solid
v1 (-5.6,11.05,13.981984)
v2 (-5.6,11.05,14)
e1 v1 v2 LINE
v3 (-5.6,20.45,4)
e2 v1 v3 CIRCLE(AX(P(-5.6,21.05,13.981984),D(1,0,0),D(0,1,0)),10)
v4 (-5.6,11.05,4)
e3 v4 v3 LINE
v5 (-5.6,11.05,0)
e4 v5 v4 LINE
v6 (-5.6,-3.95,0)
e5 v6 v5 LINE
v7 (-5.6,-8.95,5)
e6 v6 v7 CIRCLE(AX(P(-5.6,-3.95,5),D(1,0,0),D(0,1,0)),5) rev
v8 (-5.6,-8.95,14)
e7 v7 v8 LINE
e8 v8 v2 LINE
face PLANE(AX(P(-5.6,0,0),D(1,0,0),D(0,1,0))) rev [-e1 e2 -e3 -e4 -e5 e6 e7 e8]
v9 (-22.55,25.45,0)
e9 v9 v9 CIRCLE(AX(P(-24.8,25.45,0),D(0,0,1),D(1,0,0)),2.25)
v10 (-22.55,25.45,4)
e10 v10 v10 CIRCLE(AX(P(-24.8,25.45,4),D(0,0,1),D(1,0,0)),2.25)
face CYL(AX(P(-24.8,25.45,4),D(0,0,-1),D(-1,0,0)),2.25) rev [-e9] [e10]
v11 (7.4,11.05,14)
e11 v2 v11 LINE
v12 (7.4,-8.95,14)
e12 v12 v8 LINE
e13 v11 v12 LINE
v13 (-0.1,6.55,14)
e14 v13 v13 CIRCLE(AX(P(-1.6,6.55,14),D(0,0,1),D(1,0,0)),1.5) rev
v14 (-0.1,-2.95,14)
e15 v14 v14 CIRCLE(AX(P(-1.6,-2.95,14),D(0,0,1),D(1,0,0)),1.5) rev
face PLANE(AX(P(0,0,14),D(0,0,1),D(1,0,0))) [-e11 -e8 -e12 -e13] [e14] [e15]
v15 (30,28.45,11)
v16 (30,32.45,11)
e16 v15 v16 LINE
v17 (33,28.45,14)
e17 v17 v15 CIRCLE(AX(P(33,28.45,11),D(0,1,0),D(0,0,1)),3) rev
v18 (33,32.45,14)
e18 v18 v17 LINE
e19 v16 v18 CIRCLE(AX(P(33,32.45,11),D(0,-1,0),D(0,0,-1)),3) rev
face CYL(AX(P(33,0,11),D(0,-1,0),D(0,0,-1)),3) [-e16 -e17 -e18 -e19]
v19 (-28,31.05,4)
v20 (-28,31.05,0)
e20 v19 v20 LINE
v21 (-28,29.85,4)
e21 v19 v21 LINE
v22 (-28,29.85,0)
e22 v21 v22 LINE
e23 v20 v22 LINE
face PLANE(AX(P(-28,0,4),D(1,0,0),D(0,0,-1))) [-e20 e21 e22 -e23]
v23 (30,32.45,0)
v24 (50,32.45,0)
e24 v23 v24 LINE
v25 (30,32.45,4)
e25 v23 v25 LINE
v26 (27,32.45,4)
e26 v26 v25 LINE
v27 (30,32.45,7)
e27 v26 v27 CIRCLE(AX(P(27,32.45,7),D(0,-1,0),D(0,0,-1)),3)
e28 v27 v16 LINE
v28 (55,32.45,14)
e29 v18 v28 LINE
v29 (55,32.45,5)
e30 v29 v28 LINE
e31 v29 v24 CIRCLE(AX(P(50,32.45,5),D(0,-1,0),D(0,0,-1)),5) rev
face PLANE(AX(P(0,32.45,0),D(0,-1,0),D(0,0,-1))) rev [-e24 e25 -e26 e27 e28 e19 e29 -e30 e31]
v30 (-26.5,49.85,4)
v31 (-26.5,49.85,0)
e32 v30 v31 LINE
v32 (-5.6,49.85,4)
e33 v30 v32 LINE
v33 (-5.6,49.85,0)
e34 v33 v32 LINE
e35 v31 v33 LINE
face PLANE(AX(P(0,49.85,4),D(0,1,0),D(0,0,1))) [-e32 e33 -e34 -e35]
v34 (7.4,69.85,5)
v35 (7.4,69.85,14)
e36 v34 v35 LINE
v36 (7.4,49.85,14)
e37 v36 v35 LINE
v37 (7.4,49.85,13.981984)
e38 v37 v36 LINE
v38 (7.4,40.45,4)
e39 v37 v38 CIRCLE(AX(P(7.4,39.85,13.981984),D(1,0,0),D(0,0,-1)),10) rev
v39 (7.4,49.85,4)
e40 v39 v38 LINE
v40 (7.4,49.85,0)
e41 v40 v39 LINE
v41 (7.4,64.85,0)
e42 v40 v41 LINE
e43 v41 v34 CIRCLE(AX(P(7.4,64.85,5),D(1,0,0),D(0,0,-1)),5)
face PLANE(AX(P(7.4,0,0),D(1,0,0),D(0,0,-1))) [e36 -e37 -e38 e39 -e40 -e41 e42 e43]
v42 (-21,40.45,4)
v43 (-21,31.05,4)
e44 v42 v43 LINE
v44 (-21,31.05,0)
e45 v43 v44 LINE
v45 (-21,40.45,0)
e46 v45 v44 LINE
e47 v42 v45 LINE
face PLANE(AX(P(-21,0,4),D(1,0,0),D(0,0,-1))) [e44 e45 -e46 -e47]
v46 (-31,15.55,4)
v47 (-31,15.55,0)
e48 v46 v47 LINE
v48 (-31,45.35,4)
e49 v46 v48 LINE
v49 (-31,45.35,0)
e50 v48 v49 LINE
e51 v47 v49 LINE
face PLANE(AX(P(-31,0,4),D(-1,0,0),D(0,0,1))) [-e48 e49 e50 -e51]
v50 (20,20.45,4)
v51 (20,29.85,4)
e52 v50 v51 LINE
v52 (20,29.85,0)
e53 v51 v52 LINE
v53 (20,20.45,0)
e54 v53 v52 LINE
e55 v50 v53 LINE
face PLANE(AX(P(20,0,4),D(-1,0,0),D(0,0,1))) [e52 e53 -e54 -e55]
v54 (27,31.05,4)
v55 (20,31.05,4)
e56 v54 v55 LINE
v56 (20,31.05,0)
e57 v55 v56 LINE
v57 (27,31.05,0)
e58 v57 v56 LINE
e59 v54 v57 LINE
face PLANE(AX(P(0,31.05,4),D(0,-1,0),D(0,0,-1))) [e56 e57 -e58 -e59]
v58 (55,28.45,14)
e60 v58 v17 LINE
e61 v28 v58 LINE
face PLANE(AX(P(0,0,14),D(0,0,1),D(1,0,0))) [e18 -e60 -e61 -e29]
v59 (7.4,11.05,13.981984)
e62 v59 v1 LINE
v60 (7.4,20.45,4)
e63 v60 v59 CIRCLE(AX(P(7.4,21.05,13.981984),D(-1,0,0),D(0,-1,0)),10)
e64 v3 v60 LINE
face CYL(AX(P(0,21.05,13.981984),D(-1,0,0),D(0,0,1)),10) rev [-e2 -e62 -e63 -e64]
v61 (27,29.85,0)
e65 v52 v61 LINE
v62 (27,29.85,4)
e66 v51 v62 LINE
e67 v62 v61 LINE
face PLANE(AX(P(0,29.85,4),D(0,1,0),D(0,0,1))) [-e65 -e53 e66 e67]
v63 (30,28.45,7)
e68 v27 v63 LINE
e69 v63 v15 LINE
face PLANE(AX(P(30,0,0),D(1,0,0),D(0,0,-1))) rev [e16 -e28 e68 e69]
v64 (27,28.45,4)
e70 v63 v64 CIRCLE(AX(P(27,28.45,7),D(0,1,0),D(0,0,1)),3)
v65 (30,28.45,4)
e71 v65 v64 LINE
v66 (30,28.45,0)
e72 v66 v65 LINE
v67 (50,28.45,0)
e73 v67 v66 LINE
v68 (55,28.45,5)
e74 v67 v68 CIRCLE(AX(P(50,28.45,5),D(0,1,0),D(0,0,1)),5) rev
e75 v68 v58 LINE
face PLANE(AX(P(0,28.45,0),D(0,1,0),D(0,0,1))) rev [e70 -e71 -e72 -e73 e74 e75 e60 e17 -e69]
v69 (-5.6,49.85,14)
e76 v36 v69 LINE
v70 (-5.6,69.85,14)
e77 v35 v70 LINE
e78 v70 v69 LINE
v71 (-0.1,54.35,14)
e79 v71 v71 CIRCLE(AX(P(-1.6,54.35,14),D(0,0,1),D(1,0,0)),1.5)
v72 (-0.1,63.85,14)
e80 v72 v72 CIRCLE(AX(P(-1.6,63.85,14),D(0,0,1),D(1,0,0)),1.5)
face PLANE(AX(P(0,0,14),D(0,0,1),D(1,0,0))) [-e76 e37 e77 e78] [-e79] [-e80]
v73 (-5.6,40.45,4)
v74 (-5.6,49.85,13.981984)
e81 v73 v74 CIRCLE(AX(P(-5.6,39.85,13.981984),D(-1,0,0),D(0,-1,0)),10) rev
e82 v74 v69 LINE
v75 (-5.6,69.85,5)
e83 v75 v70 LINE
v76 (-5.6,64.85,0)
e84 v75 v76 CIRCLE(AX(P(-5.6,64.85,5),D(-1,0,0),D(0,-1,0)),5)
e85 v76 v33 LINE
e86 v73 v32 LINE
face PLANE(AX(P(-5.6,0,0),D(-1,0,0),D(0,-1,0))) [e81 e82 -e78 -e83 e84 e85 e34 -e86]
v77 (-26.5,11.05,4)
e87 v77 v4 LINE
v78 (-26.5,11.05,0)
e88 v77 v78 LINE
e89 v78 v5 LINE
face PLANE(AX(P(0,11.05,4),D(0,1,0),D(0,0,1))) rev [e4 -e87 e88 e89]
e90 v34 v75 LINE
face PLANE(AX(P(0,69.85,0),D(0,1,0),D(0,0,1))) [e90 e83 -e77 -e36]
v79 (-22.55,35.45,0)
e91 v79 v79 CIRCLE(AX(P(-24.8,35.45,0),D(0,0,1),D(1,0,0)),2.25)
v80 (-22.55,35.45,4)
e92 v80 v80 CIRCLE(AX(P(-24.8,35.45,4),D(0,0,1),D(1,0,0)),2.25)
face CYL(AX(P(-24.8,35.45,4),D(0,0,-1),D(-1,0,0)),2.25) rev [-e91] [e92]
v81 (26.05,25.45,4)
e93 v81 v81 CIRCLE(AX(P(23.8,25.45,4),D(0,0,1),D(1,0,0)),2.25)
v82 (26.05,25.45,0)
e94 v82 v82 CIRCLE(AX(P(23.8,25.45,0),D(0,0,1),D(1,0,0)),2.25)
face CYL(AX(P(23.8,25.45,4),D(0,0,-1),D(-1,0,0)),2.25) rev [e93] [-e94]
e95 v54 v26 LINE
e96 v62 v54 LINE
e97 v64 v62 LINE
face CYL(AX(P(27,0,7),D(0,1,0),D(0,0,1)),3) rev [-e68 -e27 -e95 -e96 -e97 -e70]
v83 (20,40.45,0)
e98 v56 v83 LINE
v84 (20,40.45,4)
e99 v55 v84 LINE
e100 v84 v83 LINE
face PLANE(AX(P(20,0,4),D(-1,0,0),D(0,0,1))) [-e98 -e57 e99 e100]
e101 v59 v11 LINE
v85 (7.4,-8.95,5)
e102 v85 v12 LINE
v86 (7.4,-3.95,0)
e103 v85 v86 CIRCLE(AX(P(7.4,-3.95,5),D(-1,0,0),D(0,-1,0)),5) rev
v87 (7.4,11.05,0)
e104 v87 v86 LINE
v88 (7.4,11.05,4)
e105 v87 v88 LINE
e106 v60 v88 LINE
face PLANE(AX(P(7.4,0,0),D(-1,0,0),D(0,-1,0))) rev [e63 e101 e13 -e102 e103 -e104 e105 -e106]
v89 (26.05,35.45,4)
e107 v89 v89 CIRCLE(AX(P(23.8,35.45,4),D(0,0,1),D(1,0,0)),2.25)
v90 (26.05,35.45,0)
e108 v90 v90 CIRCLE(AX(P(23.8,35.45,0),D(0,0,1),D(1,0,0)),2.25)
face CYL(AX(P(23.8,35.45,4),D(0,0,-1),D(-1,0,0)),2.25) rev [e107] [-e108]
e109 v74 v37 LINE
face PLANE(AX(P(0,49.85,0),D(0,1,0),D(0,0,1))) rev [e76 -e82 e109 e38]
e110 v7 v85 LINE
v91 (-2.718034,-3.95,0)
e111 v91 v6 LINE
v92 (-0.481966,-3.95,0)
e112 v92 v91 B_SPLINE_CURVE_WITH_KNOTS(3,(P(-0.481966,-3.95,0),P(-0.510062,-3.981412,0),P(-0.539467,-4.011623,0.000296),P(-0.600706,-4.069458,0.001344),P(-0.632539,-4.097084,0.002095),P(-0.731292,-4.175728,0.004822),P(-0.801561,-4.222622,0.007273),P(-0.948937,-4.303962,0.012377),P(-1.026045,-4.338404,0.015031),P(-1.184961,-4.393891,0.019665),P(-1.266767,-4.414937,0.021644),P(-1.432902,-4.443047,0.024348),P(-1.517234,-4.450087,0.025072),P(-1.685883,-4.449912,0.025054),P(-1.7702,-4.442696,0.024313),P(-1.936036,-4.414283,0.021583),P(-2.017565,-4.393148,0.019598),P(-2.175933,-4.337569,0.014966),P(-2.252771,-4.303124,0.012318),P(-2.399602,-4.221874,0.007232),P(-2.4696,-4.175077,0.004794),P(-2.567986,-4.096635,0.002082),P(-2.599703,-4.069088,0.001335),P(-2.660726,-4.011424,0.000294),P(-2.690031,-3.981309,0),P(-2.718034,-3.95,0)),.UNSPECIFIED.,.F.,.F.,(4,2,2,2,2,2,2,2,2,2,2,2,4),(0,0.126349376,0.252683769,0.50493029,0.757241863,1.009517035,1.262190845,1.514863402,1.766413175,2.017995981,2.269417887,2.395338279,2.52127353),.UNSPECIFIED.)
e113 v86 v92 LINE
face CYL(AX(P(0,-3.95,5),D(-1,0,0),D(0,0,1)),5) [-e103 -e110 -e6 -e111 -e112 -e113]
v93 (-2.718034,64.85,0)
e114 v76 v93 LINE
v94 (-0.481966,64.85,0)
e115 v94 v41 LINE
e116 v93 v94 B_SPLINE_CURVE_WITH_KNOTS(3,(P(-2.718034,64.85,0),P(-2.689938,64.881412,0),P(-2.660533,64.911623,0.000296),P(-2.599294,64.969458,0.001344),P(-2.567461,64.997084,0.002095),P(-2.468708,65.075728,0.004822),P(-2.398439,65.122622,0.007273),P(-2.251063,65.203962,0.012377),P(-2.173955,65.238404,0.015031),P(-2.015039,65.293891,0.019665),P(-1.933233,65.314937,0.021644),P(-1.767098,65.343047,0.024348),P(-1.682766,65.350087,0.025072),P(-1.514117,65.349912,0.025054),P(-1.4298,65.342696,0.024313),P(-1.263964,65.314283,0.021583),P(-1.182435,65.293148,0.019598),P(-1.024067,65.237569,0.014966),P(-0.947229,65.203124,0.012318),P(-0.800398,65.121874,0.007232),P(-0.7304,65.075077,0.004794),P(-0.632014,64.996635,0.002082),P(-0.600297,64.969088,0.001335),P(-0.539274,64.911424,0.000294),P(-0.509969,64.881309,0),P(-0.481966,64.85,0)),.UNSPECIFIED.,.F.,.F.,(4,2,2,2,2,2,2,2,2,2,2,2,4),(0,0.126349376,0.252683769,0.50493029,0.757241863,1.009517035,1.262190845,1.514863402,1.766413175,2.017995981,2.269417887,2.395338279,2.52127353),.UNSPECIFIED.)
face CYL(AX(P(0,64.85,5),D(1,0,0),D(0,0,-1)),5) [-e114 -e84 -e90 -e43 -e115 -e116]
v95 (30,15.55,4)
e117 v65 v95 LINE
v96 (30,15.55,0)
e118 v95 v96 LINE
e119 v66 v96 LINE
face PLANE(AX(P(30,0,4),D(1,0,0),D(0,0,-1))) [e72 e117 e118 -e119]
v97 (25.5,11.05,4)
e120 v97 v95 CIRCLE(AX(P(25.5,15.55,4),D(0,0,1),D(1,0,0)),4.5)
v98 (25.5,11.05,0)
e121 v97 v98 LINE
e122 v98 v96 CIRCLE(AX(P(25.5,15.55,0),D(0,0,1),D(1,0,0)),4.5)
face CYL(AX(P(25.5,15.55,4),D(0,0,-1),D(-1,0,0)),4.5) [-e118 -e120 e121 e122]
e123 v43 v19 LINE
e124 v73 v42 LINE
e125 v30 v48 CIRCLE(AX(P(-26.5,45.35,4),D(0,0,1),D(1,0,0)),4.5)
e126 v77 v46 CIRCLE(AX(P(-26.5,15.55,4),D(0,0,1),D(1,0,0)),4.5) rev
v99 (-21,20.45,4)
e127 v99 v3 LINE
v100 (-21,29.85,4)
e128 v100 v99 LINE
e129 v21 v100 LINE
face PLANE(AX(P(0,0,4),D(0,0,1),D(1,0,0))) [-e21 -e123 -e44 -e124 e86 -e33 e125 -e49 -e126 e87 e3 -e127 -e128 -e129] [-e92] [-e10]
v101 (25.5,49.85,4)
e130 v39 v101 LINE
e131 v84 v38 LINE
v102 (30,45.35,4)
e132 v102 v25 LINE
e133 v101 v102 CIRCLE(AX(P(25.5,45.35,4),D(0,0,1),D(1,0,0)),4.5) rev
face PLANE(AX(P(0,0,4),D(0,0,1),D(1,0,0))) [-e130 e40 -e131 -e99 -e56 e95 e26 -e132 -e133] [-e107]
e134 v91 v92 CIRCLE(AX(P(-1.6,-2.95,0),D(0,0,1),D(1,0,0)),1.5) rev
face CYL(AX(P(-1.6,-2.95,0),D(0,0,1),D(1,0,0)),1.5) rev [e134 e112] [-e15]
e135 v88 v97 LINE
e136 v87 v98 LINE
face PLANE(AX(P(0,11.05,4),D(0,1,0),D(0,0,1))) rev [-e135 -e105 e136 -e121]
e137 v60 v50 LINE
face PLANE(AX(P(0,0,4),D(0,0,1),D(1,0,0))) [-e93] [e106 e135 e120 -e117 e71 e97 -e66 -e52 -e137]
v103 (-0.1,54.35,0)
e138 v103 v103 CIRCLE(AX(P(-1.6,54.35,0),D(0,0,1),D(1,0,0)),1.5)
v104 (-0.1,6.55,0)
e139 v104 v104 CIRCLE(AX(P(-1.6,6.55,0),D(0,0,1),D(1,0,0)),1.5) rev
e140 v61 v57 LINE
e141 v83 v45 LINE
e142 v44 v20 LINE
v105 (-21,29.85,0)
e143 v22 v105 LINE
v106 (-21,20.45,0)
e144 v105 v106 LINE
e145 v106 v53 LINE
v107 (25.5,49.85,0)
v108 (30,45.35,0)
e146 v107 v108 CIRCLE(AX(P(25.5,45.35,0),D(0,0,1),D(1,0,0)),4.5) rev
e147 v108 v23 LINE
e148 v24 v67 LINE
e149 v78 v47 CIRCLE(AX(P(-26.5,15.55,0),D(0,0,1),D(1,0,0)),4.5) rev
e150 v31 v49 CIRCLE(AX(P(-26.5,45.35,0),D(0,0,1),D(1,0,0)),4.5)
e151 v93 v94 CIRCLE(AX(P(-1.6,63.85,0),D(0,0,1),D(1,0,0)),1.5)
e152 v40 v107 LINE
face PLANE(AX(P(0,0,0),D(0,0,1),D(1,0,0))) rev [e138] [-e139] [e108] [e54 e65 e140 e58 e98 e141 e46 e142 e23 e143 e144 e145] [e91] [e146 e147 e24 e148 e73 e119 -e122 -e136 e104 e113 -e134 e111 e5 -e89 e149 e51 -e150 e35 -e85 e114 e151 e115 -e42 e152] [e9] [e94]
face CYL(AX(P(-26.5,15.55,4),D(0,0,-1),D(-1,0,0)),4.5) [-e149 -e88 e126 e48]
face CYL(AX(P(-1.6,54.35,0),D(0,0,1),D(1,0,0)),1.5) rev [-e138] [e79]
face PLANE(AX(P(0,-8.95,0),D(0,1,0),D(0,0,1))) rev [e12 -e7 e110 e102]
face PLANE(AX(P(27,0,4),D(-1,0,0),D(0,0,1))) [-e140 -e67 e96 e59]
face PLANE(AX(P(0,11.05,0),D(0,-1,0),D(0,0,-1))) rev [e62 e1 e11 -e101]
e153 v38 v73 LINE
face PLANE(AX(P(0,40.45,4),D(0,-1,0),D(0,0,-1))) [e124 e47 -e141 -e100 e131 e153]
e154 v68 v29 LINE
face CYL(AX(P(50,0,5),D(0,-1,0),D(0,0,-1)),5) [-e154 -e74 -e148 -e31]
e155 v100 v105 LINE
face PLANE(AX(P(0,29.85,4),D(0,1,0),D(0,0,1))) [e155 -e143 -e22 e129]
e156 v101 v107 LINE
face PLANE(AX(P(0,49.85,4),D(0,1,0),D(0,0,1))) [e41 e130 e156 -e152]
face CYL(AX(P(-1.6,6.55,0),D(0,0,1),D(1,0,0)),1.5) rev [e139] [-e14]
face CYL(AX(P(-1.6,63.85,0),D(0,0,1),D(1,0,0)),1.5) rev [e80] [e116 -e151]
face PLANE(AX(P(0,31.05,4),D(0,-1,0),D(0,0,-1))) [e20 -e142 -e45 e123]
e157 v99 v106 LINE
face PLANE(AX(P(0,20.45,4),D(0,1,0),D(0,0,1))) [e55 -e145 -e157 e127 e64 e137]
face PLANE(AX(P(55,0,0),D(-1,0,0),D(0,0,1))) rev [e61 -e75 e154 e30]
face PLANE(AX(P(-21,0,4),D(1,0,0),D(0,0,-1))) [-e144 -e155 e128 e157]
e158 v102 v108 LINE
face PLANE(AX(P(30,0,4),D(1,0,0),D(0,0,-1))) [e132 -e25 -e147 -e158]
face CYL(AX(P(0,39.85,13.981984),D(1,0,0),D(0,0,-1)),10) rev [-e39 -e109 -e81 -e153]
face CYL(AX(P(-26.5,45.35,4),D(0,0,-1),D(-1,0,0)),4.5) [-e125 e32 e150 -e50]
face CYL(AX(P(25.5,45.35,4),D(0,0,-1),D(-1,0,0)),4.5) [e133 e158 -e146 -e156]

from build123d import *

# Parameters (mm, degrees)
ESBO_O1_R                     = 2.25
RESSALTO_EXTRUS_O1_DEPTH      = 4
RESSALTO_EXTRUS_O2_DEPTH      = 10
RESSALTO_EXTRUS_O2_DEPTH_BACK = 4
ESBO_O2_W                     = 10
ESBO_O2_H                     = 20
ESBO_O2_R                     = 1.5
ESBO_O2_W_2                   = 3
FILETE1_R                     = 3
FILETE2_R                     = 3
FILETE3_R                     = 10
FILETE4_R                     = 10
FILETE6_R                     = 5
FILETE7_R                     = 5
FILETE8_R                     = 5


# Some blends are built 0.0001 mm under size
with BuildPart() as part:
    # Esboço1 → Ressalto-extrusão1 (new body)
    with BuildSketch(Plane.XY):
        with BuildLine():
            Line((30, 15.55), (30, 30.45))
            Line((30, 30.45), (30, 45.35))
            ThreePointArc((30, 45.35), (28.681980515, 48.531980515), (25.5, 49.85))
            Line((25.5, 49.85), (24.5, 49.85))
            Line((24.5, 49.85), (-26.5, 49.85))
            ThreePointArc((-26.5, 49.85), (-29.681980515, 48.531980515), (-31, 45.35))
            Line((-31, 45.35), (-31, 30.45))
            Line((-31, 30.45), (-31, 15.55))
            ThreePointArc((-31, 15.55), (-29.681980515, 12.368019485), (-26.5, 11.05))
            Line((-26.5, 11.05), (25.5, 11.05))
            ThreePointArc((25.5, 11.05), (28.681980515, 12.368019485), (30, 15.55))
        make_face()
        with Locations((-24.8, 25.45)):
            Circle(ESBO_O1_R, mode=Mode.SUBTRACT)
        with Locations((23.8, 25.45)):
            Circle(ESBO_O1_R, mode=Mode.SUBTRACT)
        with Locations((-24.8, 35.45)):
            Circle(ESBO_O1_R, mode=Mode.SUBTRACT)
        Polygon((27, 31.05), (27, 30.45), (27, 29.85), (20, 29.85), (20, 20.45), (-21, 20.45), (-21, 29.85), (-28, 29.85), (-28, 31.05), (-21, 31.05), (-21, 40.45), (20, 40.45), (20, 31.05), align=None, mode=Mode.SUBTRACT)
        with Locations((23.8, 35.45)):
            Circle(ESBO_O1_R, mode=Mode.SUBTRACT)
    extrude(amount=RESSALTO_EXTRUS_O1_DEPTH)

    # Esboço2 → Ressalto-extrusão2 (add, two sides: drawn at the far end of the back side and taken through both)
    # profile 1 of 5: a face of its own
    with BuildSketch(Plane.XY.offset(4).offset(-RESSALTO_EXTRUS_O2_DEPTH_BACK)):
        with Locations((-0.6, 59.85)):
            Rectangle(ESBO_O2_W, ESBO_O2_H)
        with Locations((-1.6, 54.35)):
            Circle(ESBO_O2_R, mode=Mode.SUBTRACT)
        with Locations((-1.6, 63.85)):
            Circle(ESBO_O2_R, mode=Mode.SUBTRACT)
    # profile 2 of 5: a face of its own
    with BuildSketch(Plane.XY.offset(4).offset(-RESSALTO_EXTRUS_O2_DEPTH_BACK)):
        with Locations((5.9, 59.85)):
            Rectangle(ESBO_O2_W_2, ESBO_O2_H)
    # profile 3 of 5: a face of its own
    with BuildSketch(Plane.XY.offset(4).offset(-RESSALTO_EXTRUS_O2_DEPTH_BACK)):
        Polygon((30, 32.45), (30, 30.45), (30, 28.45), (55, 28.45), (55, 32.45), align=None)
    # profile 4 of 5: a face of its own
    with BuildSketch(Plane.XY.offset(4).offset(-RESSALTO_EXTRUS_O2_DEPTH_BACK)):
        with Locations((-0.6, 1.05)):
            Rectangle(ESBO_O2_W, ESBO_O2_H)
        with Locations((-1.6, -2.95)):
            Circle(ESBO_O2_R, mode=Mode.SUBTRACT)
        with Locations((-1.6, 6.55)):
            Circle(ESBO_O2_R, mode=Mode.SUBTRACT)
    # profile 5 of 5: a face of its own
    with BuildSketch(Plane.XY.offset(4).offset(-RESSALTO_EXTRUS_O2_DEPTH_BACK)):
        with Locations((5.9, 1.05)):
            Rectangle(ESBO_O2_W_2, ESBO_O2_H)
    extrude(amount=RESSALTO_EXTRUS_O2_DEPTH + RESSALTO_EXTRUS_O2_DEPTH_BACK)

    # Filete1
    filete1_edges = [part.edges().sort_by_distance(p)[0] for p in [
        (30, 30.45, 4),
    ]]
    fillet(filete1_edges, radius=FILETE1_R - 0.0001)  # a hair under: the kernel refuses the full size

    # Filete2
    filete2_edges = [part.edges().sort_by_distance(p)[0] for p in [
        (30, 30.45, 14),
    ]]
    fillet(filete2_edges, radius=FILETE2_R)

    # Filete3
    # the kernel refuses this fillet: 10 mm, written as the material it adds along each edge
    with BuildSketch(Plane(origin=(-5.6, 11.05, 4), x_dir=(0, 1, 0), z_dir=(1, 0, 0))) as filete3_piece_1:
        with BuildLine():
            CenterArc((10, 9.981983771), FILETE3_R, 180, 86.560187232)
            Line((0, 9.981983771), (0, 0))
            Line((0, 0), (9.4, 0))
        make_face()
    extrude(amount=13)

    # Filete4
    # the kernel refuses this fillet: 10 mm, written as the material it adds along each edge
    with BuildSketch(Plane(origin=(-5.6, 49.85, 4), x_dir=(0, -1, 0), z_dir=(1, 0, 0))) as filete4_piece_1:
        with BuildLine():
            CenterArc((10, -9.981983771), FILETE4_R, 93.439812768, 86.560187232)
            Line((0, -9.981983771), (0, 0))
            Line((0, 0), (9.4, 0))
        make_face()
    extrude(amount=13)

    # Filete6
    # the kernel refuses this fillet: 5 mm, written as the material it takes off along each edge
    with BuildSketch(Plane(origin=(-18.1, 69.85, 0), x_dir=(0, -1, 0), z_dir=(1, 0, 0))) as filete6_piece_1:
        with BuildLine():
            CenterArc((FILETE6_R, -FILETE6_R), FILETE6_R, 90, 90)
            Line((0, -FILETE6_R), (0, 0))
            Line((0, 0), (FILETE6_R, 0))
        make_face()
    extrude(amount=38, mode=Mode.SUBTRACT)

    # Filete7
    # the kernel refuses this fillet: 5 mm, written as the material it takes off along each edge
    with BuildSketch(Plane(origin=(19.9, -8.95, 0), x_dir=(0, 1, 0), z_dir=(-1, 0, 0))) as filete7_piece_1:
        with BuildLine():
            CenterArc((FILETE7_R, -FILETE7_R), FILETE7_R, 90, 90)
            Line((0, -FILETE7_R), (0, 0))
            Line((0, 0), (FILETE7_R, 0))
        make_face()
    extrude(amount=38, mode=Mode.SUBTRACT)

    # Filete8
    filete8_edges = [part.edges().sort_by_distance(p)[0] for p in [
        (55, 30.45, 0),
    ]]
    fillet(filete8_edges, radius=FILETE8_R)


solid = part.part
